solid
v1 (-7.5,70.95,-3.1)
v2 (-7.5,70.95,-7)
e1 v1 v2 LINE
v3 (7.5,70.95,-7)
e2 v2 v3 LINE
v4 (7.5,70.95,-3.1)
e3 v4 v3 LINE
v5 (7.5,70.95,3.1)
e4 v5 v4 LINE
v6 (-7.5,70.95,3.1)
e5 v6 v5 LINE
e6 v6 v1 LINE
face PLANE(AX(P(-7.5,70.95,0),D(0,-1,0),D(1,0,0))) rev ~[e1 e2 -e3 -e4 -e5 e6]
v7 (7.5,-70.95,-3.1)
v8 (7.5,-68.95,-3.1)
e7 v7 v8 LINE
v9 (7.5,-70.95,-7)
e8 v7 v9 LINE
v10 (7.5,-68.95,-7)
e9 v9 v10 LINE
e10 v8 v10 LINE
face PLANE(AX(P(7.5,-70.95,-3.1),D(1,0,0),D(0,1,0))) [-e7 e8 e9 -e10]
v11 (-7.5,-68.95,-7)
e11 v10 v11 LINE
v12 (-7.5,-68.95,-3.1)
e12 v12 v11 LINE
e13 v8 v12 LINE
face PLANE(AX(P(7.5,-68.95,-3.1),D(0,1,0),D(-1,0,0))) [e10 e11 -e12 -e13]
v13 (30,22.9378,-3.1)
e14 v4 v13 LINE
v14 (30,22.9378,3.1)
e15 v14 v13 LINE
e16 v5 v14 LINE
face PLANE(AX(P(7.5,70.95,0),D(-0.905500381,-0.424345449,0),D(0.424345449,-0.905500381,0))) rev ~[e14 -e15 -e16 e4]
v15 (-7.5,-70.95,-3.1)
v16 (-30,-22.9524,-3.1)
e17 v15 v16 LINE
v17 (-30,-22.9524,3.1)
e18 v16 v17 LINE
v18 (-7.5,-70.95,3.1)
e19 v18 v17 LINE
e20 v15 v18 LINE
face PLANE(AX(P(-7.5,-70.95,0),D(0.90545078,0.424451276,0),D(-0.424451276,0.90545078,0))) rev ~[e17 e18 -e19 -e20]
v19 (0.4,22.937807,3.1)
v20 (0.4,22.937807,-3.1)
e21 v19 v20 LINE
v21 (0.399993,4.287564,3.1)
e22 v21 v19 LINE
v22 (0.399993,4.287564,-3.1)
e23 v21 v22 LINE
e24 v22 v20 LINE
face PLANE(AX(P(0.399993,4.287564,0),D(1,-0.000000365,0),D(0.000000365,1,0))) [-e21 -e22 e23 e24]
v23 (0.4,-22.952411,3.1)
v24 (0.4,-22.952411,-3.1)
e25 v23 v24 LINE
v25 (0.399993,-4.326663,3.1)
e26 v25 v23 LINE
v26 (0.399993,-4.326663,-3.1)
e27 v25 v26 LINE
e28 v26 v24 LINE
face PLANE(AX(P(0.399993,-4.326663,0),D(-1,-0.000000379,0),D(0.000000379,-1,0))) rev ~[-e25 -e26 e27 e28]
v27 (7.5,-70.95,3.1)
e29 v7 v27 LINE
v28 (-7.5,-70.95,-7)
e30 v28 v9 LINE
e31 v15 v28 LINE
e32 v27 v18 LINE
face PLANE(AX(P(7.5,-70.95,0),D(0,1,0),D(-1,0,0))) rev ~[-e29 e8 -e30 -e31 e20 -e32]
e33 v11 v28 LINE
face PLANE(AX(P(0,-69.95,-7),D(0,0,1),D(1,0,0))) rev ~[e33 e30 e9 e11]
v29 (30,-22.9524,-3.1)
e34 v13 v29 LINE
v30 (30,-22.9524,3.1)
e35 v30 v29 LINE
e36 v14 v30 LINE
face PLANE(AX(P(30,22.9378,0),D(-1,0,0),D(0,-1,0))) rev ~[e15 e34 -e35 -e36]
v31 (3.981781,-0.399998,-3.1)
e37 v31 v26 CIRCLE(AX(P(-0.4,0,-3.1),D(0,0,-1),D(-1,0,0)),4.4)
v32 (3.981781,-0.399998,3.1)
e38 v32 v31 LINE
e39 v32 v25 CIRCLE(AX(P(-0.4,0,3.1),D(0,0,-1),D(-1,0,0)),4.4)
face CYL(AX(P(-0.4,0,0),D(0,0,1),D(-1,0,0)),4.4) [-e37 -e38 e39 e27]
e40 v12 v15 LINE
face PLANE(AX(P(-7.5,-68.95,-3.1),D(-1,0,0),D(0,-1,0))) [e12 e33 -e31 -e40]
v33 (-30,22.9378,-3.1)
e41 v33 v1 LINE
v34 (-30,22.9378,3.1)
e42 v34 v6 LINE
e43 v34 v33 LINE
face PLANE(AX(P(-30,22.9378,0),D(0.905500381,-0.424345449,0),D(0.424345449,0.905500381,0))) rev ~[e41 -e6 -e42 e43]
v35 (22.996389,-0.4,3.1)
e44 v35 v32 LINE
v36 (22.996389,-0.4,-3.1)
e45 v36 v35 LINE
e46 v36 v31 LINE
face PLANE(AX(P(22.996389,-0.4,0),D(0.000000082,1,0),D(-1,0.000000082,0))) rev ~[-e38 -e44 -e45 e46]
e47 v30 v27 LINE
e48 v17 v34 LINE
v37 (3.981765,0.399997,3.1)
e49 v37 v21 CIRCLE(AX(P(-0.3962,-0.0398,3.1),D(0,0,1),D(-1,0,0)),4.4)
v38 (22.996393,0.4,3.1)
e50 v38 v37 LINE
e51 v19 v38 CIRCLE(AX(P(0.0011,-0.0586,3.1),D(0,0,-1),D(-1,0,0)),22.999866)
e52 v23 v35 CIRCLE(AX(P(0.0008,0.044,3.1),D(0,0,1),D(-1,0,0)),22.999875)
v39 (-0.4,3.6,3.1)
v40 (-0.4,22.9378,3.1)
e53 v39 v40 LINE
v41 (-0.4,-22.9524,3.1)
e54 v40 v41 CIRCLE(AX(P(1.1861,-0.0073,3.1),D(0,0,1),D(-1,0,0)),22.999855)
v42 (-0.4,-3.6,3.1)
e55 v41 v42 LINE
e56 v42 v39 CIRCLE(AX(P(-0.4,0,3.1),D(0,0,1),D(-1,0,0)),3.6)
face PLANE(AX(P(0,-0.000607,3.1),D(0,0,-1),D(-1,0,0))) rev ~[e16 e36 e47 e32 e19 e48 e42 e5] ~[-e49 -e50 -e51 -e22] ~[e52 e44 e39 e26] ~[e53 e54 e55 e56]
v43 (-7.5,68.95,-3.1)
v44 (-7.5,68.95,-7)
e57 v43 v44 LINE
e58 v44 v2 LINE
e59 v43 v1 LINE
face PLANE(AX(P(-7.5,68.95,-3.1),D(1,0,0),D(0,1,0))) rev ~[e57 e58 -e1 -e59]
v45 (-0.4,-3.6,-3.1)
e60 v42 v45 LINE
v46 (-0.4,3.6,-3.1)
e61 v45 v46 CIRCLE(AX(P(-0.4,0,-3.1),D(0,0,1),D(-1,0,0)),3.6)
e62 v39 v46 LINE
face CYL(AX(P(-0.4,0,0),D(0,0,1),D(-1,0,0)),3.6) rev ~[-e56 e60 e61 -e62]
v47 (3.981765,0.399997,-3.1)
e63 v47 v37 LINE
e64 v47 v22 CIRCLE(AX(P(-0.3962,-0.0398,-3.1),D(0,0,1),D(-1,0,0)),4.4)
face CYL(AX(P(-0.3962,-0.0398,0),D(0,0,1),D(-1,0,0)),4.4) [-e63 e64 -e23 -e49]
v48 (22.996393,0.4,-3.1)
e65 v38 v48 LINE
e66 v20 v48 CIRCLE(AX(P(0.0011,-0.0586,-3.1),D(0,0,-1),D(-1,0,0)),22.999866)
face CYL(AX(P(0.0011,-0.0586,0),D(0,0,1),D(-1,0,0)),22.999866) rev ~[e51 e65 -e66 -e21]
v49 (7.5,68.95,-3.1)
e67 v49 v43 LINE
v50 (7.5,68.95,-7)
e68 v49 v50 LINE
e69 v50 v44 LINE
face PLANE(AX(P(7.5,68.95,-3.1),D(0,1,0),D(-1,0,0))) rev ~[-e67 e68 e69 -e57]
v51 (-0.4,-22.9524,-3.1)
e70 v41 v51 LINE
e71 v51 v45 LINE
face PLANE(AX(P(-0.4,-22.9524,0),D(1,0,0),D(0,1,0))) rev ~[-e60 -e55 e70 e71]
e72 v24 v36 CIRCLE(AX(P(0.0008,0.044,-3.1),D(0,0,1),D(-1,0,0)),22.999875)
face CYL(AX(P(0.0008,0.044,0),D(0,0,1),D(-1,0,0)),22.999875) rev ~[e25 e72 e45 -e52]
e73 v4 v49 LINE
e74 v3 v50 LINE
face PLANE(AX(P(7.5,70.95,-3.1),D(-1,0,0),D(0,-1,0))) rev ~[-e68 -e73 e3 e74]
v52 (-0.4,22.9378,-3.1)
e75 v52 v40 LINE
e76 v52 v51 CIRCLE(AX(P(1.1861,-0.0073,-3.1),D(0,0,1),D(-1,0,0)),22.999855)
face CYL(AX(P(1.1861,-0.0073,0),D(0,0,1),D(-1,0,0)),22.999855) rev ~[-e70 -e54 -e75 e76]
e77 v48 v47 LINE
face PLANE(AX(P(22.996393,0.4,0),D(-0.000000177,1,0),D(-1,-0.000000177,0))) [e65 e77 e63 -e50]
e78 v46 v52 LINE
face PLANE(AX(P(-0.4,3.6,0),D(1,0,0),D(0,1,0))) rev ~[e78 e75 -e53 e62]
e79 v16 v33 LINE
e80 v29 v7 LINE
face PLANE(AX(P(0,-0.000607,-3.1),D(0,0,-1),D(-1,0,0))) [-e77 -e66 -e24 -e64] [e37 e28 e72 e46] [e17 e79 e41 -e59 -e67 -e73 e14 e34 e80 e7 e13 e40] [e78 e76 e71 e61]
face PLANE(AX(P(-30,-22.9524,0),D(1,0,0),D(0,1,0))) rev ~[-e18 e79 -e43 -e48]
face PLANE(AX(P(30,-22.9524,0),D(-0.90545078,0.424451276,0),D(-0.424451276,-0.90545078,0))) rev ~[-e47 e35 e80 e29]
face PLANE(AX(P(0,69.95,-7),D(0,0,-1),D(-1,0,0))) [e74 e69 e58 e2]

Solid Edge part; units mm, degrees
sketch "Sketch1" plane through (0, 0, 0) normal (0, 0, -1) x (-1, 0, 0)
  line L0 (30, -22.9524) -> (30, 22.9378)
  line L1 (30, 22.9378) -> (7.5, 70.95)
  line L2 (7.5, 70.95) -> (-7.5, 70.95)
  line L3 (-7.5, 70.95) -> (-30, 22.9378)
  line L4 (-30, 22.9378) -> (-30, -22.9524)
  line L5 (-30, -22.9524) -> (-7.5, -70.95)
  line L6 (-7.5, -70.95) -> (7.5, -70.95)
  line L7 (7.5, -70.95) -> (30, -22.9524)
  line L8 (-0.4, 4.2876) -> (-0.4, 22.9378)
  arc A0 (-3.9818, 0.4) -> (-0.4, 4.2876) centre (0.3962, -0.0398) cw
  line L9 (-22.9964, 0.4) -> (-3.9818, 0.4)
  arc A1 (-0.4, 22.9378) -> (-22.9964, 0.4) centre (-0.0011, -0.0586) ccw
  line L10 (-22.9964, -0.4) -> (-3.9818, -0.4)
  arc A2 (-0.4, -22.9524) -> (-22.9964, -0.4) centre (-0.0008, 0.044) cw
  line L11 (-0.4, -4.3267) -> (-0.4, -22.9524)
  arc A3 (-3.9818, -0.4) -> (-0.4, -4.3267) centre (0.4, 0) ccw
  arc A4 (0.4, 22.9378) -> (0.4, -22.9524) centre (-1.1861, -0.0073) cw
  line L12 (0.4, 3.6) -> (0.4, 22.9378)
  arc A5 (0.4, -3.6) -> (0.4, 3.6) centre (0.4, 0) cw
  line L13 (0.4, -22.9524) -> (0.4, -3.6)
extrude "ExtrudedProtrusion_3" add sketch "Sketch1" along normal mid plane 6.2
sketch "Sketch2" plane through (0, 0, -3.1) normal (0, 0, -1) x (0, 1, 0)
  line L0 (-68.95, -7.5) -> (-70.95, -7.5)
  line L1 (-70.95, -7.5) -> (-70.95, 7.5)
  line L2 (-70.95, 7.5) -> (-68.95, 7.5)
  line L3 (-68.95, 7.5) -> (-68.95, -7.5)
  line L4 (68.95, 7.5) -> (68.95, -7.5)
  line L5 (68.95, -7.5) -> (70.95, -7.5)
  line L6 (70.95, -7.5) -> (70.95, 7.5)
  line L7 (70.95, 7.5) -> (68.95, 7.5)
  dimension "D1" = 15
  dimension "D2" = 2
extrude "ExtrudedProtrusion_4" add sketch "Sketch2" along normal blind 3.9
properties material "PLA Filament"
